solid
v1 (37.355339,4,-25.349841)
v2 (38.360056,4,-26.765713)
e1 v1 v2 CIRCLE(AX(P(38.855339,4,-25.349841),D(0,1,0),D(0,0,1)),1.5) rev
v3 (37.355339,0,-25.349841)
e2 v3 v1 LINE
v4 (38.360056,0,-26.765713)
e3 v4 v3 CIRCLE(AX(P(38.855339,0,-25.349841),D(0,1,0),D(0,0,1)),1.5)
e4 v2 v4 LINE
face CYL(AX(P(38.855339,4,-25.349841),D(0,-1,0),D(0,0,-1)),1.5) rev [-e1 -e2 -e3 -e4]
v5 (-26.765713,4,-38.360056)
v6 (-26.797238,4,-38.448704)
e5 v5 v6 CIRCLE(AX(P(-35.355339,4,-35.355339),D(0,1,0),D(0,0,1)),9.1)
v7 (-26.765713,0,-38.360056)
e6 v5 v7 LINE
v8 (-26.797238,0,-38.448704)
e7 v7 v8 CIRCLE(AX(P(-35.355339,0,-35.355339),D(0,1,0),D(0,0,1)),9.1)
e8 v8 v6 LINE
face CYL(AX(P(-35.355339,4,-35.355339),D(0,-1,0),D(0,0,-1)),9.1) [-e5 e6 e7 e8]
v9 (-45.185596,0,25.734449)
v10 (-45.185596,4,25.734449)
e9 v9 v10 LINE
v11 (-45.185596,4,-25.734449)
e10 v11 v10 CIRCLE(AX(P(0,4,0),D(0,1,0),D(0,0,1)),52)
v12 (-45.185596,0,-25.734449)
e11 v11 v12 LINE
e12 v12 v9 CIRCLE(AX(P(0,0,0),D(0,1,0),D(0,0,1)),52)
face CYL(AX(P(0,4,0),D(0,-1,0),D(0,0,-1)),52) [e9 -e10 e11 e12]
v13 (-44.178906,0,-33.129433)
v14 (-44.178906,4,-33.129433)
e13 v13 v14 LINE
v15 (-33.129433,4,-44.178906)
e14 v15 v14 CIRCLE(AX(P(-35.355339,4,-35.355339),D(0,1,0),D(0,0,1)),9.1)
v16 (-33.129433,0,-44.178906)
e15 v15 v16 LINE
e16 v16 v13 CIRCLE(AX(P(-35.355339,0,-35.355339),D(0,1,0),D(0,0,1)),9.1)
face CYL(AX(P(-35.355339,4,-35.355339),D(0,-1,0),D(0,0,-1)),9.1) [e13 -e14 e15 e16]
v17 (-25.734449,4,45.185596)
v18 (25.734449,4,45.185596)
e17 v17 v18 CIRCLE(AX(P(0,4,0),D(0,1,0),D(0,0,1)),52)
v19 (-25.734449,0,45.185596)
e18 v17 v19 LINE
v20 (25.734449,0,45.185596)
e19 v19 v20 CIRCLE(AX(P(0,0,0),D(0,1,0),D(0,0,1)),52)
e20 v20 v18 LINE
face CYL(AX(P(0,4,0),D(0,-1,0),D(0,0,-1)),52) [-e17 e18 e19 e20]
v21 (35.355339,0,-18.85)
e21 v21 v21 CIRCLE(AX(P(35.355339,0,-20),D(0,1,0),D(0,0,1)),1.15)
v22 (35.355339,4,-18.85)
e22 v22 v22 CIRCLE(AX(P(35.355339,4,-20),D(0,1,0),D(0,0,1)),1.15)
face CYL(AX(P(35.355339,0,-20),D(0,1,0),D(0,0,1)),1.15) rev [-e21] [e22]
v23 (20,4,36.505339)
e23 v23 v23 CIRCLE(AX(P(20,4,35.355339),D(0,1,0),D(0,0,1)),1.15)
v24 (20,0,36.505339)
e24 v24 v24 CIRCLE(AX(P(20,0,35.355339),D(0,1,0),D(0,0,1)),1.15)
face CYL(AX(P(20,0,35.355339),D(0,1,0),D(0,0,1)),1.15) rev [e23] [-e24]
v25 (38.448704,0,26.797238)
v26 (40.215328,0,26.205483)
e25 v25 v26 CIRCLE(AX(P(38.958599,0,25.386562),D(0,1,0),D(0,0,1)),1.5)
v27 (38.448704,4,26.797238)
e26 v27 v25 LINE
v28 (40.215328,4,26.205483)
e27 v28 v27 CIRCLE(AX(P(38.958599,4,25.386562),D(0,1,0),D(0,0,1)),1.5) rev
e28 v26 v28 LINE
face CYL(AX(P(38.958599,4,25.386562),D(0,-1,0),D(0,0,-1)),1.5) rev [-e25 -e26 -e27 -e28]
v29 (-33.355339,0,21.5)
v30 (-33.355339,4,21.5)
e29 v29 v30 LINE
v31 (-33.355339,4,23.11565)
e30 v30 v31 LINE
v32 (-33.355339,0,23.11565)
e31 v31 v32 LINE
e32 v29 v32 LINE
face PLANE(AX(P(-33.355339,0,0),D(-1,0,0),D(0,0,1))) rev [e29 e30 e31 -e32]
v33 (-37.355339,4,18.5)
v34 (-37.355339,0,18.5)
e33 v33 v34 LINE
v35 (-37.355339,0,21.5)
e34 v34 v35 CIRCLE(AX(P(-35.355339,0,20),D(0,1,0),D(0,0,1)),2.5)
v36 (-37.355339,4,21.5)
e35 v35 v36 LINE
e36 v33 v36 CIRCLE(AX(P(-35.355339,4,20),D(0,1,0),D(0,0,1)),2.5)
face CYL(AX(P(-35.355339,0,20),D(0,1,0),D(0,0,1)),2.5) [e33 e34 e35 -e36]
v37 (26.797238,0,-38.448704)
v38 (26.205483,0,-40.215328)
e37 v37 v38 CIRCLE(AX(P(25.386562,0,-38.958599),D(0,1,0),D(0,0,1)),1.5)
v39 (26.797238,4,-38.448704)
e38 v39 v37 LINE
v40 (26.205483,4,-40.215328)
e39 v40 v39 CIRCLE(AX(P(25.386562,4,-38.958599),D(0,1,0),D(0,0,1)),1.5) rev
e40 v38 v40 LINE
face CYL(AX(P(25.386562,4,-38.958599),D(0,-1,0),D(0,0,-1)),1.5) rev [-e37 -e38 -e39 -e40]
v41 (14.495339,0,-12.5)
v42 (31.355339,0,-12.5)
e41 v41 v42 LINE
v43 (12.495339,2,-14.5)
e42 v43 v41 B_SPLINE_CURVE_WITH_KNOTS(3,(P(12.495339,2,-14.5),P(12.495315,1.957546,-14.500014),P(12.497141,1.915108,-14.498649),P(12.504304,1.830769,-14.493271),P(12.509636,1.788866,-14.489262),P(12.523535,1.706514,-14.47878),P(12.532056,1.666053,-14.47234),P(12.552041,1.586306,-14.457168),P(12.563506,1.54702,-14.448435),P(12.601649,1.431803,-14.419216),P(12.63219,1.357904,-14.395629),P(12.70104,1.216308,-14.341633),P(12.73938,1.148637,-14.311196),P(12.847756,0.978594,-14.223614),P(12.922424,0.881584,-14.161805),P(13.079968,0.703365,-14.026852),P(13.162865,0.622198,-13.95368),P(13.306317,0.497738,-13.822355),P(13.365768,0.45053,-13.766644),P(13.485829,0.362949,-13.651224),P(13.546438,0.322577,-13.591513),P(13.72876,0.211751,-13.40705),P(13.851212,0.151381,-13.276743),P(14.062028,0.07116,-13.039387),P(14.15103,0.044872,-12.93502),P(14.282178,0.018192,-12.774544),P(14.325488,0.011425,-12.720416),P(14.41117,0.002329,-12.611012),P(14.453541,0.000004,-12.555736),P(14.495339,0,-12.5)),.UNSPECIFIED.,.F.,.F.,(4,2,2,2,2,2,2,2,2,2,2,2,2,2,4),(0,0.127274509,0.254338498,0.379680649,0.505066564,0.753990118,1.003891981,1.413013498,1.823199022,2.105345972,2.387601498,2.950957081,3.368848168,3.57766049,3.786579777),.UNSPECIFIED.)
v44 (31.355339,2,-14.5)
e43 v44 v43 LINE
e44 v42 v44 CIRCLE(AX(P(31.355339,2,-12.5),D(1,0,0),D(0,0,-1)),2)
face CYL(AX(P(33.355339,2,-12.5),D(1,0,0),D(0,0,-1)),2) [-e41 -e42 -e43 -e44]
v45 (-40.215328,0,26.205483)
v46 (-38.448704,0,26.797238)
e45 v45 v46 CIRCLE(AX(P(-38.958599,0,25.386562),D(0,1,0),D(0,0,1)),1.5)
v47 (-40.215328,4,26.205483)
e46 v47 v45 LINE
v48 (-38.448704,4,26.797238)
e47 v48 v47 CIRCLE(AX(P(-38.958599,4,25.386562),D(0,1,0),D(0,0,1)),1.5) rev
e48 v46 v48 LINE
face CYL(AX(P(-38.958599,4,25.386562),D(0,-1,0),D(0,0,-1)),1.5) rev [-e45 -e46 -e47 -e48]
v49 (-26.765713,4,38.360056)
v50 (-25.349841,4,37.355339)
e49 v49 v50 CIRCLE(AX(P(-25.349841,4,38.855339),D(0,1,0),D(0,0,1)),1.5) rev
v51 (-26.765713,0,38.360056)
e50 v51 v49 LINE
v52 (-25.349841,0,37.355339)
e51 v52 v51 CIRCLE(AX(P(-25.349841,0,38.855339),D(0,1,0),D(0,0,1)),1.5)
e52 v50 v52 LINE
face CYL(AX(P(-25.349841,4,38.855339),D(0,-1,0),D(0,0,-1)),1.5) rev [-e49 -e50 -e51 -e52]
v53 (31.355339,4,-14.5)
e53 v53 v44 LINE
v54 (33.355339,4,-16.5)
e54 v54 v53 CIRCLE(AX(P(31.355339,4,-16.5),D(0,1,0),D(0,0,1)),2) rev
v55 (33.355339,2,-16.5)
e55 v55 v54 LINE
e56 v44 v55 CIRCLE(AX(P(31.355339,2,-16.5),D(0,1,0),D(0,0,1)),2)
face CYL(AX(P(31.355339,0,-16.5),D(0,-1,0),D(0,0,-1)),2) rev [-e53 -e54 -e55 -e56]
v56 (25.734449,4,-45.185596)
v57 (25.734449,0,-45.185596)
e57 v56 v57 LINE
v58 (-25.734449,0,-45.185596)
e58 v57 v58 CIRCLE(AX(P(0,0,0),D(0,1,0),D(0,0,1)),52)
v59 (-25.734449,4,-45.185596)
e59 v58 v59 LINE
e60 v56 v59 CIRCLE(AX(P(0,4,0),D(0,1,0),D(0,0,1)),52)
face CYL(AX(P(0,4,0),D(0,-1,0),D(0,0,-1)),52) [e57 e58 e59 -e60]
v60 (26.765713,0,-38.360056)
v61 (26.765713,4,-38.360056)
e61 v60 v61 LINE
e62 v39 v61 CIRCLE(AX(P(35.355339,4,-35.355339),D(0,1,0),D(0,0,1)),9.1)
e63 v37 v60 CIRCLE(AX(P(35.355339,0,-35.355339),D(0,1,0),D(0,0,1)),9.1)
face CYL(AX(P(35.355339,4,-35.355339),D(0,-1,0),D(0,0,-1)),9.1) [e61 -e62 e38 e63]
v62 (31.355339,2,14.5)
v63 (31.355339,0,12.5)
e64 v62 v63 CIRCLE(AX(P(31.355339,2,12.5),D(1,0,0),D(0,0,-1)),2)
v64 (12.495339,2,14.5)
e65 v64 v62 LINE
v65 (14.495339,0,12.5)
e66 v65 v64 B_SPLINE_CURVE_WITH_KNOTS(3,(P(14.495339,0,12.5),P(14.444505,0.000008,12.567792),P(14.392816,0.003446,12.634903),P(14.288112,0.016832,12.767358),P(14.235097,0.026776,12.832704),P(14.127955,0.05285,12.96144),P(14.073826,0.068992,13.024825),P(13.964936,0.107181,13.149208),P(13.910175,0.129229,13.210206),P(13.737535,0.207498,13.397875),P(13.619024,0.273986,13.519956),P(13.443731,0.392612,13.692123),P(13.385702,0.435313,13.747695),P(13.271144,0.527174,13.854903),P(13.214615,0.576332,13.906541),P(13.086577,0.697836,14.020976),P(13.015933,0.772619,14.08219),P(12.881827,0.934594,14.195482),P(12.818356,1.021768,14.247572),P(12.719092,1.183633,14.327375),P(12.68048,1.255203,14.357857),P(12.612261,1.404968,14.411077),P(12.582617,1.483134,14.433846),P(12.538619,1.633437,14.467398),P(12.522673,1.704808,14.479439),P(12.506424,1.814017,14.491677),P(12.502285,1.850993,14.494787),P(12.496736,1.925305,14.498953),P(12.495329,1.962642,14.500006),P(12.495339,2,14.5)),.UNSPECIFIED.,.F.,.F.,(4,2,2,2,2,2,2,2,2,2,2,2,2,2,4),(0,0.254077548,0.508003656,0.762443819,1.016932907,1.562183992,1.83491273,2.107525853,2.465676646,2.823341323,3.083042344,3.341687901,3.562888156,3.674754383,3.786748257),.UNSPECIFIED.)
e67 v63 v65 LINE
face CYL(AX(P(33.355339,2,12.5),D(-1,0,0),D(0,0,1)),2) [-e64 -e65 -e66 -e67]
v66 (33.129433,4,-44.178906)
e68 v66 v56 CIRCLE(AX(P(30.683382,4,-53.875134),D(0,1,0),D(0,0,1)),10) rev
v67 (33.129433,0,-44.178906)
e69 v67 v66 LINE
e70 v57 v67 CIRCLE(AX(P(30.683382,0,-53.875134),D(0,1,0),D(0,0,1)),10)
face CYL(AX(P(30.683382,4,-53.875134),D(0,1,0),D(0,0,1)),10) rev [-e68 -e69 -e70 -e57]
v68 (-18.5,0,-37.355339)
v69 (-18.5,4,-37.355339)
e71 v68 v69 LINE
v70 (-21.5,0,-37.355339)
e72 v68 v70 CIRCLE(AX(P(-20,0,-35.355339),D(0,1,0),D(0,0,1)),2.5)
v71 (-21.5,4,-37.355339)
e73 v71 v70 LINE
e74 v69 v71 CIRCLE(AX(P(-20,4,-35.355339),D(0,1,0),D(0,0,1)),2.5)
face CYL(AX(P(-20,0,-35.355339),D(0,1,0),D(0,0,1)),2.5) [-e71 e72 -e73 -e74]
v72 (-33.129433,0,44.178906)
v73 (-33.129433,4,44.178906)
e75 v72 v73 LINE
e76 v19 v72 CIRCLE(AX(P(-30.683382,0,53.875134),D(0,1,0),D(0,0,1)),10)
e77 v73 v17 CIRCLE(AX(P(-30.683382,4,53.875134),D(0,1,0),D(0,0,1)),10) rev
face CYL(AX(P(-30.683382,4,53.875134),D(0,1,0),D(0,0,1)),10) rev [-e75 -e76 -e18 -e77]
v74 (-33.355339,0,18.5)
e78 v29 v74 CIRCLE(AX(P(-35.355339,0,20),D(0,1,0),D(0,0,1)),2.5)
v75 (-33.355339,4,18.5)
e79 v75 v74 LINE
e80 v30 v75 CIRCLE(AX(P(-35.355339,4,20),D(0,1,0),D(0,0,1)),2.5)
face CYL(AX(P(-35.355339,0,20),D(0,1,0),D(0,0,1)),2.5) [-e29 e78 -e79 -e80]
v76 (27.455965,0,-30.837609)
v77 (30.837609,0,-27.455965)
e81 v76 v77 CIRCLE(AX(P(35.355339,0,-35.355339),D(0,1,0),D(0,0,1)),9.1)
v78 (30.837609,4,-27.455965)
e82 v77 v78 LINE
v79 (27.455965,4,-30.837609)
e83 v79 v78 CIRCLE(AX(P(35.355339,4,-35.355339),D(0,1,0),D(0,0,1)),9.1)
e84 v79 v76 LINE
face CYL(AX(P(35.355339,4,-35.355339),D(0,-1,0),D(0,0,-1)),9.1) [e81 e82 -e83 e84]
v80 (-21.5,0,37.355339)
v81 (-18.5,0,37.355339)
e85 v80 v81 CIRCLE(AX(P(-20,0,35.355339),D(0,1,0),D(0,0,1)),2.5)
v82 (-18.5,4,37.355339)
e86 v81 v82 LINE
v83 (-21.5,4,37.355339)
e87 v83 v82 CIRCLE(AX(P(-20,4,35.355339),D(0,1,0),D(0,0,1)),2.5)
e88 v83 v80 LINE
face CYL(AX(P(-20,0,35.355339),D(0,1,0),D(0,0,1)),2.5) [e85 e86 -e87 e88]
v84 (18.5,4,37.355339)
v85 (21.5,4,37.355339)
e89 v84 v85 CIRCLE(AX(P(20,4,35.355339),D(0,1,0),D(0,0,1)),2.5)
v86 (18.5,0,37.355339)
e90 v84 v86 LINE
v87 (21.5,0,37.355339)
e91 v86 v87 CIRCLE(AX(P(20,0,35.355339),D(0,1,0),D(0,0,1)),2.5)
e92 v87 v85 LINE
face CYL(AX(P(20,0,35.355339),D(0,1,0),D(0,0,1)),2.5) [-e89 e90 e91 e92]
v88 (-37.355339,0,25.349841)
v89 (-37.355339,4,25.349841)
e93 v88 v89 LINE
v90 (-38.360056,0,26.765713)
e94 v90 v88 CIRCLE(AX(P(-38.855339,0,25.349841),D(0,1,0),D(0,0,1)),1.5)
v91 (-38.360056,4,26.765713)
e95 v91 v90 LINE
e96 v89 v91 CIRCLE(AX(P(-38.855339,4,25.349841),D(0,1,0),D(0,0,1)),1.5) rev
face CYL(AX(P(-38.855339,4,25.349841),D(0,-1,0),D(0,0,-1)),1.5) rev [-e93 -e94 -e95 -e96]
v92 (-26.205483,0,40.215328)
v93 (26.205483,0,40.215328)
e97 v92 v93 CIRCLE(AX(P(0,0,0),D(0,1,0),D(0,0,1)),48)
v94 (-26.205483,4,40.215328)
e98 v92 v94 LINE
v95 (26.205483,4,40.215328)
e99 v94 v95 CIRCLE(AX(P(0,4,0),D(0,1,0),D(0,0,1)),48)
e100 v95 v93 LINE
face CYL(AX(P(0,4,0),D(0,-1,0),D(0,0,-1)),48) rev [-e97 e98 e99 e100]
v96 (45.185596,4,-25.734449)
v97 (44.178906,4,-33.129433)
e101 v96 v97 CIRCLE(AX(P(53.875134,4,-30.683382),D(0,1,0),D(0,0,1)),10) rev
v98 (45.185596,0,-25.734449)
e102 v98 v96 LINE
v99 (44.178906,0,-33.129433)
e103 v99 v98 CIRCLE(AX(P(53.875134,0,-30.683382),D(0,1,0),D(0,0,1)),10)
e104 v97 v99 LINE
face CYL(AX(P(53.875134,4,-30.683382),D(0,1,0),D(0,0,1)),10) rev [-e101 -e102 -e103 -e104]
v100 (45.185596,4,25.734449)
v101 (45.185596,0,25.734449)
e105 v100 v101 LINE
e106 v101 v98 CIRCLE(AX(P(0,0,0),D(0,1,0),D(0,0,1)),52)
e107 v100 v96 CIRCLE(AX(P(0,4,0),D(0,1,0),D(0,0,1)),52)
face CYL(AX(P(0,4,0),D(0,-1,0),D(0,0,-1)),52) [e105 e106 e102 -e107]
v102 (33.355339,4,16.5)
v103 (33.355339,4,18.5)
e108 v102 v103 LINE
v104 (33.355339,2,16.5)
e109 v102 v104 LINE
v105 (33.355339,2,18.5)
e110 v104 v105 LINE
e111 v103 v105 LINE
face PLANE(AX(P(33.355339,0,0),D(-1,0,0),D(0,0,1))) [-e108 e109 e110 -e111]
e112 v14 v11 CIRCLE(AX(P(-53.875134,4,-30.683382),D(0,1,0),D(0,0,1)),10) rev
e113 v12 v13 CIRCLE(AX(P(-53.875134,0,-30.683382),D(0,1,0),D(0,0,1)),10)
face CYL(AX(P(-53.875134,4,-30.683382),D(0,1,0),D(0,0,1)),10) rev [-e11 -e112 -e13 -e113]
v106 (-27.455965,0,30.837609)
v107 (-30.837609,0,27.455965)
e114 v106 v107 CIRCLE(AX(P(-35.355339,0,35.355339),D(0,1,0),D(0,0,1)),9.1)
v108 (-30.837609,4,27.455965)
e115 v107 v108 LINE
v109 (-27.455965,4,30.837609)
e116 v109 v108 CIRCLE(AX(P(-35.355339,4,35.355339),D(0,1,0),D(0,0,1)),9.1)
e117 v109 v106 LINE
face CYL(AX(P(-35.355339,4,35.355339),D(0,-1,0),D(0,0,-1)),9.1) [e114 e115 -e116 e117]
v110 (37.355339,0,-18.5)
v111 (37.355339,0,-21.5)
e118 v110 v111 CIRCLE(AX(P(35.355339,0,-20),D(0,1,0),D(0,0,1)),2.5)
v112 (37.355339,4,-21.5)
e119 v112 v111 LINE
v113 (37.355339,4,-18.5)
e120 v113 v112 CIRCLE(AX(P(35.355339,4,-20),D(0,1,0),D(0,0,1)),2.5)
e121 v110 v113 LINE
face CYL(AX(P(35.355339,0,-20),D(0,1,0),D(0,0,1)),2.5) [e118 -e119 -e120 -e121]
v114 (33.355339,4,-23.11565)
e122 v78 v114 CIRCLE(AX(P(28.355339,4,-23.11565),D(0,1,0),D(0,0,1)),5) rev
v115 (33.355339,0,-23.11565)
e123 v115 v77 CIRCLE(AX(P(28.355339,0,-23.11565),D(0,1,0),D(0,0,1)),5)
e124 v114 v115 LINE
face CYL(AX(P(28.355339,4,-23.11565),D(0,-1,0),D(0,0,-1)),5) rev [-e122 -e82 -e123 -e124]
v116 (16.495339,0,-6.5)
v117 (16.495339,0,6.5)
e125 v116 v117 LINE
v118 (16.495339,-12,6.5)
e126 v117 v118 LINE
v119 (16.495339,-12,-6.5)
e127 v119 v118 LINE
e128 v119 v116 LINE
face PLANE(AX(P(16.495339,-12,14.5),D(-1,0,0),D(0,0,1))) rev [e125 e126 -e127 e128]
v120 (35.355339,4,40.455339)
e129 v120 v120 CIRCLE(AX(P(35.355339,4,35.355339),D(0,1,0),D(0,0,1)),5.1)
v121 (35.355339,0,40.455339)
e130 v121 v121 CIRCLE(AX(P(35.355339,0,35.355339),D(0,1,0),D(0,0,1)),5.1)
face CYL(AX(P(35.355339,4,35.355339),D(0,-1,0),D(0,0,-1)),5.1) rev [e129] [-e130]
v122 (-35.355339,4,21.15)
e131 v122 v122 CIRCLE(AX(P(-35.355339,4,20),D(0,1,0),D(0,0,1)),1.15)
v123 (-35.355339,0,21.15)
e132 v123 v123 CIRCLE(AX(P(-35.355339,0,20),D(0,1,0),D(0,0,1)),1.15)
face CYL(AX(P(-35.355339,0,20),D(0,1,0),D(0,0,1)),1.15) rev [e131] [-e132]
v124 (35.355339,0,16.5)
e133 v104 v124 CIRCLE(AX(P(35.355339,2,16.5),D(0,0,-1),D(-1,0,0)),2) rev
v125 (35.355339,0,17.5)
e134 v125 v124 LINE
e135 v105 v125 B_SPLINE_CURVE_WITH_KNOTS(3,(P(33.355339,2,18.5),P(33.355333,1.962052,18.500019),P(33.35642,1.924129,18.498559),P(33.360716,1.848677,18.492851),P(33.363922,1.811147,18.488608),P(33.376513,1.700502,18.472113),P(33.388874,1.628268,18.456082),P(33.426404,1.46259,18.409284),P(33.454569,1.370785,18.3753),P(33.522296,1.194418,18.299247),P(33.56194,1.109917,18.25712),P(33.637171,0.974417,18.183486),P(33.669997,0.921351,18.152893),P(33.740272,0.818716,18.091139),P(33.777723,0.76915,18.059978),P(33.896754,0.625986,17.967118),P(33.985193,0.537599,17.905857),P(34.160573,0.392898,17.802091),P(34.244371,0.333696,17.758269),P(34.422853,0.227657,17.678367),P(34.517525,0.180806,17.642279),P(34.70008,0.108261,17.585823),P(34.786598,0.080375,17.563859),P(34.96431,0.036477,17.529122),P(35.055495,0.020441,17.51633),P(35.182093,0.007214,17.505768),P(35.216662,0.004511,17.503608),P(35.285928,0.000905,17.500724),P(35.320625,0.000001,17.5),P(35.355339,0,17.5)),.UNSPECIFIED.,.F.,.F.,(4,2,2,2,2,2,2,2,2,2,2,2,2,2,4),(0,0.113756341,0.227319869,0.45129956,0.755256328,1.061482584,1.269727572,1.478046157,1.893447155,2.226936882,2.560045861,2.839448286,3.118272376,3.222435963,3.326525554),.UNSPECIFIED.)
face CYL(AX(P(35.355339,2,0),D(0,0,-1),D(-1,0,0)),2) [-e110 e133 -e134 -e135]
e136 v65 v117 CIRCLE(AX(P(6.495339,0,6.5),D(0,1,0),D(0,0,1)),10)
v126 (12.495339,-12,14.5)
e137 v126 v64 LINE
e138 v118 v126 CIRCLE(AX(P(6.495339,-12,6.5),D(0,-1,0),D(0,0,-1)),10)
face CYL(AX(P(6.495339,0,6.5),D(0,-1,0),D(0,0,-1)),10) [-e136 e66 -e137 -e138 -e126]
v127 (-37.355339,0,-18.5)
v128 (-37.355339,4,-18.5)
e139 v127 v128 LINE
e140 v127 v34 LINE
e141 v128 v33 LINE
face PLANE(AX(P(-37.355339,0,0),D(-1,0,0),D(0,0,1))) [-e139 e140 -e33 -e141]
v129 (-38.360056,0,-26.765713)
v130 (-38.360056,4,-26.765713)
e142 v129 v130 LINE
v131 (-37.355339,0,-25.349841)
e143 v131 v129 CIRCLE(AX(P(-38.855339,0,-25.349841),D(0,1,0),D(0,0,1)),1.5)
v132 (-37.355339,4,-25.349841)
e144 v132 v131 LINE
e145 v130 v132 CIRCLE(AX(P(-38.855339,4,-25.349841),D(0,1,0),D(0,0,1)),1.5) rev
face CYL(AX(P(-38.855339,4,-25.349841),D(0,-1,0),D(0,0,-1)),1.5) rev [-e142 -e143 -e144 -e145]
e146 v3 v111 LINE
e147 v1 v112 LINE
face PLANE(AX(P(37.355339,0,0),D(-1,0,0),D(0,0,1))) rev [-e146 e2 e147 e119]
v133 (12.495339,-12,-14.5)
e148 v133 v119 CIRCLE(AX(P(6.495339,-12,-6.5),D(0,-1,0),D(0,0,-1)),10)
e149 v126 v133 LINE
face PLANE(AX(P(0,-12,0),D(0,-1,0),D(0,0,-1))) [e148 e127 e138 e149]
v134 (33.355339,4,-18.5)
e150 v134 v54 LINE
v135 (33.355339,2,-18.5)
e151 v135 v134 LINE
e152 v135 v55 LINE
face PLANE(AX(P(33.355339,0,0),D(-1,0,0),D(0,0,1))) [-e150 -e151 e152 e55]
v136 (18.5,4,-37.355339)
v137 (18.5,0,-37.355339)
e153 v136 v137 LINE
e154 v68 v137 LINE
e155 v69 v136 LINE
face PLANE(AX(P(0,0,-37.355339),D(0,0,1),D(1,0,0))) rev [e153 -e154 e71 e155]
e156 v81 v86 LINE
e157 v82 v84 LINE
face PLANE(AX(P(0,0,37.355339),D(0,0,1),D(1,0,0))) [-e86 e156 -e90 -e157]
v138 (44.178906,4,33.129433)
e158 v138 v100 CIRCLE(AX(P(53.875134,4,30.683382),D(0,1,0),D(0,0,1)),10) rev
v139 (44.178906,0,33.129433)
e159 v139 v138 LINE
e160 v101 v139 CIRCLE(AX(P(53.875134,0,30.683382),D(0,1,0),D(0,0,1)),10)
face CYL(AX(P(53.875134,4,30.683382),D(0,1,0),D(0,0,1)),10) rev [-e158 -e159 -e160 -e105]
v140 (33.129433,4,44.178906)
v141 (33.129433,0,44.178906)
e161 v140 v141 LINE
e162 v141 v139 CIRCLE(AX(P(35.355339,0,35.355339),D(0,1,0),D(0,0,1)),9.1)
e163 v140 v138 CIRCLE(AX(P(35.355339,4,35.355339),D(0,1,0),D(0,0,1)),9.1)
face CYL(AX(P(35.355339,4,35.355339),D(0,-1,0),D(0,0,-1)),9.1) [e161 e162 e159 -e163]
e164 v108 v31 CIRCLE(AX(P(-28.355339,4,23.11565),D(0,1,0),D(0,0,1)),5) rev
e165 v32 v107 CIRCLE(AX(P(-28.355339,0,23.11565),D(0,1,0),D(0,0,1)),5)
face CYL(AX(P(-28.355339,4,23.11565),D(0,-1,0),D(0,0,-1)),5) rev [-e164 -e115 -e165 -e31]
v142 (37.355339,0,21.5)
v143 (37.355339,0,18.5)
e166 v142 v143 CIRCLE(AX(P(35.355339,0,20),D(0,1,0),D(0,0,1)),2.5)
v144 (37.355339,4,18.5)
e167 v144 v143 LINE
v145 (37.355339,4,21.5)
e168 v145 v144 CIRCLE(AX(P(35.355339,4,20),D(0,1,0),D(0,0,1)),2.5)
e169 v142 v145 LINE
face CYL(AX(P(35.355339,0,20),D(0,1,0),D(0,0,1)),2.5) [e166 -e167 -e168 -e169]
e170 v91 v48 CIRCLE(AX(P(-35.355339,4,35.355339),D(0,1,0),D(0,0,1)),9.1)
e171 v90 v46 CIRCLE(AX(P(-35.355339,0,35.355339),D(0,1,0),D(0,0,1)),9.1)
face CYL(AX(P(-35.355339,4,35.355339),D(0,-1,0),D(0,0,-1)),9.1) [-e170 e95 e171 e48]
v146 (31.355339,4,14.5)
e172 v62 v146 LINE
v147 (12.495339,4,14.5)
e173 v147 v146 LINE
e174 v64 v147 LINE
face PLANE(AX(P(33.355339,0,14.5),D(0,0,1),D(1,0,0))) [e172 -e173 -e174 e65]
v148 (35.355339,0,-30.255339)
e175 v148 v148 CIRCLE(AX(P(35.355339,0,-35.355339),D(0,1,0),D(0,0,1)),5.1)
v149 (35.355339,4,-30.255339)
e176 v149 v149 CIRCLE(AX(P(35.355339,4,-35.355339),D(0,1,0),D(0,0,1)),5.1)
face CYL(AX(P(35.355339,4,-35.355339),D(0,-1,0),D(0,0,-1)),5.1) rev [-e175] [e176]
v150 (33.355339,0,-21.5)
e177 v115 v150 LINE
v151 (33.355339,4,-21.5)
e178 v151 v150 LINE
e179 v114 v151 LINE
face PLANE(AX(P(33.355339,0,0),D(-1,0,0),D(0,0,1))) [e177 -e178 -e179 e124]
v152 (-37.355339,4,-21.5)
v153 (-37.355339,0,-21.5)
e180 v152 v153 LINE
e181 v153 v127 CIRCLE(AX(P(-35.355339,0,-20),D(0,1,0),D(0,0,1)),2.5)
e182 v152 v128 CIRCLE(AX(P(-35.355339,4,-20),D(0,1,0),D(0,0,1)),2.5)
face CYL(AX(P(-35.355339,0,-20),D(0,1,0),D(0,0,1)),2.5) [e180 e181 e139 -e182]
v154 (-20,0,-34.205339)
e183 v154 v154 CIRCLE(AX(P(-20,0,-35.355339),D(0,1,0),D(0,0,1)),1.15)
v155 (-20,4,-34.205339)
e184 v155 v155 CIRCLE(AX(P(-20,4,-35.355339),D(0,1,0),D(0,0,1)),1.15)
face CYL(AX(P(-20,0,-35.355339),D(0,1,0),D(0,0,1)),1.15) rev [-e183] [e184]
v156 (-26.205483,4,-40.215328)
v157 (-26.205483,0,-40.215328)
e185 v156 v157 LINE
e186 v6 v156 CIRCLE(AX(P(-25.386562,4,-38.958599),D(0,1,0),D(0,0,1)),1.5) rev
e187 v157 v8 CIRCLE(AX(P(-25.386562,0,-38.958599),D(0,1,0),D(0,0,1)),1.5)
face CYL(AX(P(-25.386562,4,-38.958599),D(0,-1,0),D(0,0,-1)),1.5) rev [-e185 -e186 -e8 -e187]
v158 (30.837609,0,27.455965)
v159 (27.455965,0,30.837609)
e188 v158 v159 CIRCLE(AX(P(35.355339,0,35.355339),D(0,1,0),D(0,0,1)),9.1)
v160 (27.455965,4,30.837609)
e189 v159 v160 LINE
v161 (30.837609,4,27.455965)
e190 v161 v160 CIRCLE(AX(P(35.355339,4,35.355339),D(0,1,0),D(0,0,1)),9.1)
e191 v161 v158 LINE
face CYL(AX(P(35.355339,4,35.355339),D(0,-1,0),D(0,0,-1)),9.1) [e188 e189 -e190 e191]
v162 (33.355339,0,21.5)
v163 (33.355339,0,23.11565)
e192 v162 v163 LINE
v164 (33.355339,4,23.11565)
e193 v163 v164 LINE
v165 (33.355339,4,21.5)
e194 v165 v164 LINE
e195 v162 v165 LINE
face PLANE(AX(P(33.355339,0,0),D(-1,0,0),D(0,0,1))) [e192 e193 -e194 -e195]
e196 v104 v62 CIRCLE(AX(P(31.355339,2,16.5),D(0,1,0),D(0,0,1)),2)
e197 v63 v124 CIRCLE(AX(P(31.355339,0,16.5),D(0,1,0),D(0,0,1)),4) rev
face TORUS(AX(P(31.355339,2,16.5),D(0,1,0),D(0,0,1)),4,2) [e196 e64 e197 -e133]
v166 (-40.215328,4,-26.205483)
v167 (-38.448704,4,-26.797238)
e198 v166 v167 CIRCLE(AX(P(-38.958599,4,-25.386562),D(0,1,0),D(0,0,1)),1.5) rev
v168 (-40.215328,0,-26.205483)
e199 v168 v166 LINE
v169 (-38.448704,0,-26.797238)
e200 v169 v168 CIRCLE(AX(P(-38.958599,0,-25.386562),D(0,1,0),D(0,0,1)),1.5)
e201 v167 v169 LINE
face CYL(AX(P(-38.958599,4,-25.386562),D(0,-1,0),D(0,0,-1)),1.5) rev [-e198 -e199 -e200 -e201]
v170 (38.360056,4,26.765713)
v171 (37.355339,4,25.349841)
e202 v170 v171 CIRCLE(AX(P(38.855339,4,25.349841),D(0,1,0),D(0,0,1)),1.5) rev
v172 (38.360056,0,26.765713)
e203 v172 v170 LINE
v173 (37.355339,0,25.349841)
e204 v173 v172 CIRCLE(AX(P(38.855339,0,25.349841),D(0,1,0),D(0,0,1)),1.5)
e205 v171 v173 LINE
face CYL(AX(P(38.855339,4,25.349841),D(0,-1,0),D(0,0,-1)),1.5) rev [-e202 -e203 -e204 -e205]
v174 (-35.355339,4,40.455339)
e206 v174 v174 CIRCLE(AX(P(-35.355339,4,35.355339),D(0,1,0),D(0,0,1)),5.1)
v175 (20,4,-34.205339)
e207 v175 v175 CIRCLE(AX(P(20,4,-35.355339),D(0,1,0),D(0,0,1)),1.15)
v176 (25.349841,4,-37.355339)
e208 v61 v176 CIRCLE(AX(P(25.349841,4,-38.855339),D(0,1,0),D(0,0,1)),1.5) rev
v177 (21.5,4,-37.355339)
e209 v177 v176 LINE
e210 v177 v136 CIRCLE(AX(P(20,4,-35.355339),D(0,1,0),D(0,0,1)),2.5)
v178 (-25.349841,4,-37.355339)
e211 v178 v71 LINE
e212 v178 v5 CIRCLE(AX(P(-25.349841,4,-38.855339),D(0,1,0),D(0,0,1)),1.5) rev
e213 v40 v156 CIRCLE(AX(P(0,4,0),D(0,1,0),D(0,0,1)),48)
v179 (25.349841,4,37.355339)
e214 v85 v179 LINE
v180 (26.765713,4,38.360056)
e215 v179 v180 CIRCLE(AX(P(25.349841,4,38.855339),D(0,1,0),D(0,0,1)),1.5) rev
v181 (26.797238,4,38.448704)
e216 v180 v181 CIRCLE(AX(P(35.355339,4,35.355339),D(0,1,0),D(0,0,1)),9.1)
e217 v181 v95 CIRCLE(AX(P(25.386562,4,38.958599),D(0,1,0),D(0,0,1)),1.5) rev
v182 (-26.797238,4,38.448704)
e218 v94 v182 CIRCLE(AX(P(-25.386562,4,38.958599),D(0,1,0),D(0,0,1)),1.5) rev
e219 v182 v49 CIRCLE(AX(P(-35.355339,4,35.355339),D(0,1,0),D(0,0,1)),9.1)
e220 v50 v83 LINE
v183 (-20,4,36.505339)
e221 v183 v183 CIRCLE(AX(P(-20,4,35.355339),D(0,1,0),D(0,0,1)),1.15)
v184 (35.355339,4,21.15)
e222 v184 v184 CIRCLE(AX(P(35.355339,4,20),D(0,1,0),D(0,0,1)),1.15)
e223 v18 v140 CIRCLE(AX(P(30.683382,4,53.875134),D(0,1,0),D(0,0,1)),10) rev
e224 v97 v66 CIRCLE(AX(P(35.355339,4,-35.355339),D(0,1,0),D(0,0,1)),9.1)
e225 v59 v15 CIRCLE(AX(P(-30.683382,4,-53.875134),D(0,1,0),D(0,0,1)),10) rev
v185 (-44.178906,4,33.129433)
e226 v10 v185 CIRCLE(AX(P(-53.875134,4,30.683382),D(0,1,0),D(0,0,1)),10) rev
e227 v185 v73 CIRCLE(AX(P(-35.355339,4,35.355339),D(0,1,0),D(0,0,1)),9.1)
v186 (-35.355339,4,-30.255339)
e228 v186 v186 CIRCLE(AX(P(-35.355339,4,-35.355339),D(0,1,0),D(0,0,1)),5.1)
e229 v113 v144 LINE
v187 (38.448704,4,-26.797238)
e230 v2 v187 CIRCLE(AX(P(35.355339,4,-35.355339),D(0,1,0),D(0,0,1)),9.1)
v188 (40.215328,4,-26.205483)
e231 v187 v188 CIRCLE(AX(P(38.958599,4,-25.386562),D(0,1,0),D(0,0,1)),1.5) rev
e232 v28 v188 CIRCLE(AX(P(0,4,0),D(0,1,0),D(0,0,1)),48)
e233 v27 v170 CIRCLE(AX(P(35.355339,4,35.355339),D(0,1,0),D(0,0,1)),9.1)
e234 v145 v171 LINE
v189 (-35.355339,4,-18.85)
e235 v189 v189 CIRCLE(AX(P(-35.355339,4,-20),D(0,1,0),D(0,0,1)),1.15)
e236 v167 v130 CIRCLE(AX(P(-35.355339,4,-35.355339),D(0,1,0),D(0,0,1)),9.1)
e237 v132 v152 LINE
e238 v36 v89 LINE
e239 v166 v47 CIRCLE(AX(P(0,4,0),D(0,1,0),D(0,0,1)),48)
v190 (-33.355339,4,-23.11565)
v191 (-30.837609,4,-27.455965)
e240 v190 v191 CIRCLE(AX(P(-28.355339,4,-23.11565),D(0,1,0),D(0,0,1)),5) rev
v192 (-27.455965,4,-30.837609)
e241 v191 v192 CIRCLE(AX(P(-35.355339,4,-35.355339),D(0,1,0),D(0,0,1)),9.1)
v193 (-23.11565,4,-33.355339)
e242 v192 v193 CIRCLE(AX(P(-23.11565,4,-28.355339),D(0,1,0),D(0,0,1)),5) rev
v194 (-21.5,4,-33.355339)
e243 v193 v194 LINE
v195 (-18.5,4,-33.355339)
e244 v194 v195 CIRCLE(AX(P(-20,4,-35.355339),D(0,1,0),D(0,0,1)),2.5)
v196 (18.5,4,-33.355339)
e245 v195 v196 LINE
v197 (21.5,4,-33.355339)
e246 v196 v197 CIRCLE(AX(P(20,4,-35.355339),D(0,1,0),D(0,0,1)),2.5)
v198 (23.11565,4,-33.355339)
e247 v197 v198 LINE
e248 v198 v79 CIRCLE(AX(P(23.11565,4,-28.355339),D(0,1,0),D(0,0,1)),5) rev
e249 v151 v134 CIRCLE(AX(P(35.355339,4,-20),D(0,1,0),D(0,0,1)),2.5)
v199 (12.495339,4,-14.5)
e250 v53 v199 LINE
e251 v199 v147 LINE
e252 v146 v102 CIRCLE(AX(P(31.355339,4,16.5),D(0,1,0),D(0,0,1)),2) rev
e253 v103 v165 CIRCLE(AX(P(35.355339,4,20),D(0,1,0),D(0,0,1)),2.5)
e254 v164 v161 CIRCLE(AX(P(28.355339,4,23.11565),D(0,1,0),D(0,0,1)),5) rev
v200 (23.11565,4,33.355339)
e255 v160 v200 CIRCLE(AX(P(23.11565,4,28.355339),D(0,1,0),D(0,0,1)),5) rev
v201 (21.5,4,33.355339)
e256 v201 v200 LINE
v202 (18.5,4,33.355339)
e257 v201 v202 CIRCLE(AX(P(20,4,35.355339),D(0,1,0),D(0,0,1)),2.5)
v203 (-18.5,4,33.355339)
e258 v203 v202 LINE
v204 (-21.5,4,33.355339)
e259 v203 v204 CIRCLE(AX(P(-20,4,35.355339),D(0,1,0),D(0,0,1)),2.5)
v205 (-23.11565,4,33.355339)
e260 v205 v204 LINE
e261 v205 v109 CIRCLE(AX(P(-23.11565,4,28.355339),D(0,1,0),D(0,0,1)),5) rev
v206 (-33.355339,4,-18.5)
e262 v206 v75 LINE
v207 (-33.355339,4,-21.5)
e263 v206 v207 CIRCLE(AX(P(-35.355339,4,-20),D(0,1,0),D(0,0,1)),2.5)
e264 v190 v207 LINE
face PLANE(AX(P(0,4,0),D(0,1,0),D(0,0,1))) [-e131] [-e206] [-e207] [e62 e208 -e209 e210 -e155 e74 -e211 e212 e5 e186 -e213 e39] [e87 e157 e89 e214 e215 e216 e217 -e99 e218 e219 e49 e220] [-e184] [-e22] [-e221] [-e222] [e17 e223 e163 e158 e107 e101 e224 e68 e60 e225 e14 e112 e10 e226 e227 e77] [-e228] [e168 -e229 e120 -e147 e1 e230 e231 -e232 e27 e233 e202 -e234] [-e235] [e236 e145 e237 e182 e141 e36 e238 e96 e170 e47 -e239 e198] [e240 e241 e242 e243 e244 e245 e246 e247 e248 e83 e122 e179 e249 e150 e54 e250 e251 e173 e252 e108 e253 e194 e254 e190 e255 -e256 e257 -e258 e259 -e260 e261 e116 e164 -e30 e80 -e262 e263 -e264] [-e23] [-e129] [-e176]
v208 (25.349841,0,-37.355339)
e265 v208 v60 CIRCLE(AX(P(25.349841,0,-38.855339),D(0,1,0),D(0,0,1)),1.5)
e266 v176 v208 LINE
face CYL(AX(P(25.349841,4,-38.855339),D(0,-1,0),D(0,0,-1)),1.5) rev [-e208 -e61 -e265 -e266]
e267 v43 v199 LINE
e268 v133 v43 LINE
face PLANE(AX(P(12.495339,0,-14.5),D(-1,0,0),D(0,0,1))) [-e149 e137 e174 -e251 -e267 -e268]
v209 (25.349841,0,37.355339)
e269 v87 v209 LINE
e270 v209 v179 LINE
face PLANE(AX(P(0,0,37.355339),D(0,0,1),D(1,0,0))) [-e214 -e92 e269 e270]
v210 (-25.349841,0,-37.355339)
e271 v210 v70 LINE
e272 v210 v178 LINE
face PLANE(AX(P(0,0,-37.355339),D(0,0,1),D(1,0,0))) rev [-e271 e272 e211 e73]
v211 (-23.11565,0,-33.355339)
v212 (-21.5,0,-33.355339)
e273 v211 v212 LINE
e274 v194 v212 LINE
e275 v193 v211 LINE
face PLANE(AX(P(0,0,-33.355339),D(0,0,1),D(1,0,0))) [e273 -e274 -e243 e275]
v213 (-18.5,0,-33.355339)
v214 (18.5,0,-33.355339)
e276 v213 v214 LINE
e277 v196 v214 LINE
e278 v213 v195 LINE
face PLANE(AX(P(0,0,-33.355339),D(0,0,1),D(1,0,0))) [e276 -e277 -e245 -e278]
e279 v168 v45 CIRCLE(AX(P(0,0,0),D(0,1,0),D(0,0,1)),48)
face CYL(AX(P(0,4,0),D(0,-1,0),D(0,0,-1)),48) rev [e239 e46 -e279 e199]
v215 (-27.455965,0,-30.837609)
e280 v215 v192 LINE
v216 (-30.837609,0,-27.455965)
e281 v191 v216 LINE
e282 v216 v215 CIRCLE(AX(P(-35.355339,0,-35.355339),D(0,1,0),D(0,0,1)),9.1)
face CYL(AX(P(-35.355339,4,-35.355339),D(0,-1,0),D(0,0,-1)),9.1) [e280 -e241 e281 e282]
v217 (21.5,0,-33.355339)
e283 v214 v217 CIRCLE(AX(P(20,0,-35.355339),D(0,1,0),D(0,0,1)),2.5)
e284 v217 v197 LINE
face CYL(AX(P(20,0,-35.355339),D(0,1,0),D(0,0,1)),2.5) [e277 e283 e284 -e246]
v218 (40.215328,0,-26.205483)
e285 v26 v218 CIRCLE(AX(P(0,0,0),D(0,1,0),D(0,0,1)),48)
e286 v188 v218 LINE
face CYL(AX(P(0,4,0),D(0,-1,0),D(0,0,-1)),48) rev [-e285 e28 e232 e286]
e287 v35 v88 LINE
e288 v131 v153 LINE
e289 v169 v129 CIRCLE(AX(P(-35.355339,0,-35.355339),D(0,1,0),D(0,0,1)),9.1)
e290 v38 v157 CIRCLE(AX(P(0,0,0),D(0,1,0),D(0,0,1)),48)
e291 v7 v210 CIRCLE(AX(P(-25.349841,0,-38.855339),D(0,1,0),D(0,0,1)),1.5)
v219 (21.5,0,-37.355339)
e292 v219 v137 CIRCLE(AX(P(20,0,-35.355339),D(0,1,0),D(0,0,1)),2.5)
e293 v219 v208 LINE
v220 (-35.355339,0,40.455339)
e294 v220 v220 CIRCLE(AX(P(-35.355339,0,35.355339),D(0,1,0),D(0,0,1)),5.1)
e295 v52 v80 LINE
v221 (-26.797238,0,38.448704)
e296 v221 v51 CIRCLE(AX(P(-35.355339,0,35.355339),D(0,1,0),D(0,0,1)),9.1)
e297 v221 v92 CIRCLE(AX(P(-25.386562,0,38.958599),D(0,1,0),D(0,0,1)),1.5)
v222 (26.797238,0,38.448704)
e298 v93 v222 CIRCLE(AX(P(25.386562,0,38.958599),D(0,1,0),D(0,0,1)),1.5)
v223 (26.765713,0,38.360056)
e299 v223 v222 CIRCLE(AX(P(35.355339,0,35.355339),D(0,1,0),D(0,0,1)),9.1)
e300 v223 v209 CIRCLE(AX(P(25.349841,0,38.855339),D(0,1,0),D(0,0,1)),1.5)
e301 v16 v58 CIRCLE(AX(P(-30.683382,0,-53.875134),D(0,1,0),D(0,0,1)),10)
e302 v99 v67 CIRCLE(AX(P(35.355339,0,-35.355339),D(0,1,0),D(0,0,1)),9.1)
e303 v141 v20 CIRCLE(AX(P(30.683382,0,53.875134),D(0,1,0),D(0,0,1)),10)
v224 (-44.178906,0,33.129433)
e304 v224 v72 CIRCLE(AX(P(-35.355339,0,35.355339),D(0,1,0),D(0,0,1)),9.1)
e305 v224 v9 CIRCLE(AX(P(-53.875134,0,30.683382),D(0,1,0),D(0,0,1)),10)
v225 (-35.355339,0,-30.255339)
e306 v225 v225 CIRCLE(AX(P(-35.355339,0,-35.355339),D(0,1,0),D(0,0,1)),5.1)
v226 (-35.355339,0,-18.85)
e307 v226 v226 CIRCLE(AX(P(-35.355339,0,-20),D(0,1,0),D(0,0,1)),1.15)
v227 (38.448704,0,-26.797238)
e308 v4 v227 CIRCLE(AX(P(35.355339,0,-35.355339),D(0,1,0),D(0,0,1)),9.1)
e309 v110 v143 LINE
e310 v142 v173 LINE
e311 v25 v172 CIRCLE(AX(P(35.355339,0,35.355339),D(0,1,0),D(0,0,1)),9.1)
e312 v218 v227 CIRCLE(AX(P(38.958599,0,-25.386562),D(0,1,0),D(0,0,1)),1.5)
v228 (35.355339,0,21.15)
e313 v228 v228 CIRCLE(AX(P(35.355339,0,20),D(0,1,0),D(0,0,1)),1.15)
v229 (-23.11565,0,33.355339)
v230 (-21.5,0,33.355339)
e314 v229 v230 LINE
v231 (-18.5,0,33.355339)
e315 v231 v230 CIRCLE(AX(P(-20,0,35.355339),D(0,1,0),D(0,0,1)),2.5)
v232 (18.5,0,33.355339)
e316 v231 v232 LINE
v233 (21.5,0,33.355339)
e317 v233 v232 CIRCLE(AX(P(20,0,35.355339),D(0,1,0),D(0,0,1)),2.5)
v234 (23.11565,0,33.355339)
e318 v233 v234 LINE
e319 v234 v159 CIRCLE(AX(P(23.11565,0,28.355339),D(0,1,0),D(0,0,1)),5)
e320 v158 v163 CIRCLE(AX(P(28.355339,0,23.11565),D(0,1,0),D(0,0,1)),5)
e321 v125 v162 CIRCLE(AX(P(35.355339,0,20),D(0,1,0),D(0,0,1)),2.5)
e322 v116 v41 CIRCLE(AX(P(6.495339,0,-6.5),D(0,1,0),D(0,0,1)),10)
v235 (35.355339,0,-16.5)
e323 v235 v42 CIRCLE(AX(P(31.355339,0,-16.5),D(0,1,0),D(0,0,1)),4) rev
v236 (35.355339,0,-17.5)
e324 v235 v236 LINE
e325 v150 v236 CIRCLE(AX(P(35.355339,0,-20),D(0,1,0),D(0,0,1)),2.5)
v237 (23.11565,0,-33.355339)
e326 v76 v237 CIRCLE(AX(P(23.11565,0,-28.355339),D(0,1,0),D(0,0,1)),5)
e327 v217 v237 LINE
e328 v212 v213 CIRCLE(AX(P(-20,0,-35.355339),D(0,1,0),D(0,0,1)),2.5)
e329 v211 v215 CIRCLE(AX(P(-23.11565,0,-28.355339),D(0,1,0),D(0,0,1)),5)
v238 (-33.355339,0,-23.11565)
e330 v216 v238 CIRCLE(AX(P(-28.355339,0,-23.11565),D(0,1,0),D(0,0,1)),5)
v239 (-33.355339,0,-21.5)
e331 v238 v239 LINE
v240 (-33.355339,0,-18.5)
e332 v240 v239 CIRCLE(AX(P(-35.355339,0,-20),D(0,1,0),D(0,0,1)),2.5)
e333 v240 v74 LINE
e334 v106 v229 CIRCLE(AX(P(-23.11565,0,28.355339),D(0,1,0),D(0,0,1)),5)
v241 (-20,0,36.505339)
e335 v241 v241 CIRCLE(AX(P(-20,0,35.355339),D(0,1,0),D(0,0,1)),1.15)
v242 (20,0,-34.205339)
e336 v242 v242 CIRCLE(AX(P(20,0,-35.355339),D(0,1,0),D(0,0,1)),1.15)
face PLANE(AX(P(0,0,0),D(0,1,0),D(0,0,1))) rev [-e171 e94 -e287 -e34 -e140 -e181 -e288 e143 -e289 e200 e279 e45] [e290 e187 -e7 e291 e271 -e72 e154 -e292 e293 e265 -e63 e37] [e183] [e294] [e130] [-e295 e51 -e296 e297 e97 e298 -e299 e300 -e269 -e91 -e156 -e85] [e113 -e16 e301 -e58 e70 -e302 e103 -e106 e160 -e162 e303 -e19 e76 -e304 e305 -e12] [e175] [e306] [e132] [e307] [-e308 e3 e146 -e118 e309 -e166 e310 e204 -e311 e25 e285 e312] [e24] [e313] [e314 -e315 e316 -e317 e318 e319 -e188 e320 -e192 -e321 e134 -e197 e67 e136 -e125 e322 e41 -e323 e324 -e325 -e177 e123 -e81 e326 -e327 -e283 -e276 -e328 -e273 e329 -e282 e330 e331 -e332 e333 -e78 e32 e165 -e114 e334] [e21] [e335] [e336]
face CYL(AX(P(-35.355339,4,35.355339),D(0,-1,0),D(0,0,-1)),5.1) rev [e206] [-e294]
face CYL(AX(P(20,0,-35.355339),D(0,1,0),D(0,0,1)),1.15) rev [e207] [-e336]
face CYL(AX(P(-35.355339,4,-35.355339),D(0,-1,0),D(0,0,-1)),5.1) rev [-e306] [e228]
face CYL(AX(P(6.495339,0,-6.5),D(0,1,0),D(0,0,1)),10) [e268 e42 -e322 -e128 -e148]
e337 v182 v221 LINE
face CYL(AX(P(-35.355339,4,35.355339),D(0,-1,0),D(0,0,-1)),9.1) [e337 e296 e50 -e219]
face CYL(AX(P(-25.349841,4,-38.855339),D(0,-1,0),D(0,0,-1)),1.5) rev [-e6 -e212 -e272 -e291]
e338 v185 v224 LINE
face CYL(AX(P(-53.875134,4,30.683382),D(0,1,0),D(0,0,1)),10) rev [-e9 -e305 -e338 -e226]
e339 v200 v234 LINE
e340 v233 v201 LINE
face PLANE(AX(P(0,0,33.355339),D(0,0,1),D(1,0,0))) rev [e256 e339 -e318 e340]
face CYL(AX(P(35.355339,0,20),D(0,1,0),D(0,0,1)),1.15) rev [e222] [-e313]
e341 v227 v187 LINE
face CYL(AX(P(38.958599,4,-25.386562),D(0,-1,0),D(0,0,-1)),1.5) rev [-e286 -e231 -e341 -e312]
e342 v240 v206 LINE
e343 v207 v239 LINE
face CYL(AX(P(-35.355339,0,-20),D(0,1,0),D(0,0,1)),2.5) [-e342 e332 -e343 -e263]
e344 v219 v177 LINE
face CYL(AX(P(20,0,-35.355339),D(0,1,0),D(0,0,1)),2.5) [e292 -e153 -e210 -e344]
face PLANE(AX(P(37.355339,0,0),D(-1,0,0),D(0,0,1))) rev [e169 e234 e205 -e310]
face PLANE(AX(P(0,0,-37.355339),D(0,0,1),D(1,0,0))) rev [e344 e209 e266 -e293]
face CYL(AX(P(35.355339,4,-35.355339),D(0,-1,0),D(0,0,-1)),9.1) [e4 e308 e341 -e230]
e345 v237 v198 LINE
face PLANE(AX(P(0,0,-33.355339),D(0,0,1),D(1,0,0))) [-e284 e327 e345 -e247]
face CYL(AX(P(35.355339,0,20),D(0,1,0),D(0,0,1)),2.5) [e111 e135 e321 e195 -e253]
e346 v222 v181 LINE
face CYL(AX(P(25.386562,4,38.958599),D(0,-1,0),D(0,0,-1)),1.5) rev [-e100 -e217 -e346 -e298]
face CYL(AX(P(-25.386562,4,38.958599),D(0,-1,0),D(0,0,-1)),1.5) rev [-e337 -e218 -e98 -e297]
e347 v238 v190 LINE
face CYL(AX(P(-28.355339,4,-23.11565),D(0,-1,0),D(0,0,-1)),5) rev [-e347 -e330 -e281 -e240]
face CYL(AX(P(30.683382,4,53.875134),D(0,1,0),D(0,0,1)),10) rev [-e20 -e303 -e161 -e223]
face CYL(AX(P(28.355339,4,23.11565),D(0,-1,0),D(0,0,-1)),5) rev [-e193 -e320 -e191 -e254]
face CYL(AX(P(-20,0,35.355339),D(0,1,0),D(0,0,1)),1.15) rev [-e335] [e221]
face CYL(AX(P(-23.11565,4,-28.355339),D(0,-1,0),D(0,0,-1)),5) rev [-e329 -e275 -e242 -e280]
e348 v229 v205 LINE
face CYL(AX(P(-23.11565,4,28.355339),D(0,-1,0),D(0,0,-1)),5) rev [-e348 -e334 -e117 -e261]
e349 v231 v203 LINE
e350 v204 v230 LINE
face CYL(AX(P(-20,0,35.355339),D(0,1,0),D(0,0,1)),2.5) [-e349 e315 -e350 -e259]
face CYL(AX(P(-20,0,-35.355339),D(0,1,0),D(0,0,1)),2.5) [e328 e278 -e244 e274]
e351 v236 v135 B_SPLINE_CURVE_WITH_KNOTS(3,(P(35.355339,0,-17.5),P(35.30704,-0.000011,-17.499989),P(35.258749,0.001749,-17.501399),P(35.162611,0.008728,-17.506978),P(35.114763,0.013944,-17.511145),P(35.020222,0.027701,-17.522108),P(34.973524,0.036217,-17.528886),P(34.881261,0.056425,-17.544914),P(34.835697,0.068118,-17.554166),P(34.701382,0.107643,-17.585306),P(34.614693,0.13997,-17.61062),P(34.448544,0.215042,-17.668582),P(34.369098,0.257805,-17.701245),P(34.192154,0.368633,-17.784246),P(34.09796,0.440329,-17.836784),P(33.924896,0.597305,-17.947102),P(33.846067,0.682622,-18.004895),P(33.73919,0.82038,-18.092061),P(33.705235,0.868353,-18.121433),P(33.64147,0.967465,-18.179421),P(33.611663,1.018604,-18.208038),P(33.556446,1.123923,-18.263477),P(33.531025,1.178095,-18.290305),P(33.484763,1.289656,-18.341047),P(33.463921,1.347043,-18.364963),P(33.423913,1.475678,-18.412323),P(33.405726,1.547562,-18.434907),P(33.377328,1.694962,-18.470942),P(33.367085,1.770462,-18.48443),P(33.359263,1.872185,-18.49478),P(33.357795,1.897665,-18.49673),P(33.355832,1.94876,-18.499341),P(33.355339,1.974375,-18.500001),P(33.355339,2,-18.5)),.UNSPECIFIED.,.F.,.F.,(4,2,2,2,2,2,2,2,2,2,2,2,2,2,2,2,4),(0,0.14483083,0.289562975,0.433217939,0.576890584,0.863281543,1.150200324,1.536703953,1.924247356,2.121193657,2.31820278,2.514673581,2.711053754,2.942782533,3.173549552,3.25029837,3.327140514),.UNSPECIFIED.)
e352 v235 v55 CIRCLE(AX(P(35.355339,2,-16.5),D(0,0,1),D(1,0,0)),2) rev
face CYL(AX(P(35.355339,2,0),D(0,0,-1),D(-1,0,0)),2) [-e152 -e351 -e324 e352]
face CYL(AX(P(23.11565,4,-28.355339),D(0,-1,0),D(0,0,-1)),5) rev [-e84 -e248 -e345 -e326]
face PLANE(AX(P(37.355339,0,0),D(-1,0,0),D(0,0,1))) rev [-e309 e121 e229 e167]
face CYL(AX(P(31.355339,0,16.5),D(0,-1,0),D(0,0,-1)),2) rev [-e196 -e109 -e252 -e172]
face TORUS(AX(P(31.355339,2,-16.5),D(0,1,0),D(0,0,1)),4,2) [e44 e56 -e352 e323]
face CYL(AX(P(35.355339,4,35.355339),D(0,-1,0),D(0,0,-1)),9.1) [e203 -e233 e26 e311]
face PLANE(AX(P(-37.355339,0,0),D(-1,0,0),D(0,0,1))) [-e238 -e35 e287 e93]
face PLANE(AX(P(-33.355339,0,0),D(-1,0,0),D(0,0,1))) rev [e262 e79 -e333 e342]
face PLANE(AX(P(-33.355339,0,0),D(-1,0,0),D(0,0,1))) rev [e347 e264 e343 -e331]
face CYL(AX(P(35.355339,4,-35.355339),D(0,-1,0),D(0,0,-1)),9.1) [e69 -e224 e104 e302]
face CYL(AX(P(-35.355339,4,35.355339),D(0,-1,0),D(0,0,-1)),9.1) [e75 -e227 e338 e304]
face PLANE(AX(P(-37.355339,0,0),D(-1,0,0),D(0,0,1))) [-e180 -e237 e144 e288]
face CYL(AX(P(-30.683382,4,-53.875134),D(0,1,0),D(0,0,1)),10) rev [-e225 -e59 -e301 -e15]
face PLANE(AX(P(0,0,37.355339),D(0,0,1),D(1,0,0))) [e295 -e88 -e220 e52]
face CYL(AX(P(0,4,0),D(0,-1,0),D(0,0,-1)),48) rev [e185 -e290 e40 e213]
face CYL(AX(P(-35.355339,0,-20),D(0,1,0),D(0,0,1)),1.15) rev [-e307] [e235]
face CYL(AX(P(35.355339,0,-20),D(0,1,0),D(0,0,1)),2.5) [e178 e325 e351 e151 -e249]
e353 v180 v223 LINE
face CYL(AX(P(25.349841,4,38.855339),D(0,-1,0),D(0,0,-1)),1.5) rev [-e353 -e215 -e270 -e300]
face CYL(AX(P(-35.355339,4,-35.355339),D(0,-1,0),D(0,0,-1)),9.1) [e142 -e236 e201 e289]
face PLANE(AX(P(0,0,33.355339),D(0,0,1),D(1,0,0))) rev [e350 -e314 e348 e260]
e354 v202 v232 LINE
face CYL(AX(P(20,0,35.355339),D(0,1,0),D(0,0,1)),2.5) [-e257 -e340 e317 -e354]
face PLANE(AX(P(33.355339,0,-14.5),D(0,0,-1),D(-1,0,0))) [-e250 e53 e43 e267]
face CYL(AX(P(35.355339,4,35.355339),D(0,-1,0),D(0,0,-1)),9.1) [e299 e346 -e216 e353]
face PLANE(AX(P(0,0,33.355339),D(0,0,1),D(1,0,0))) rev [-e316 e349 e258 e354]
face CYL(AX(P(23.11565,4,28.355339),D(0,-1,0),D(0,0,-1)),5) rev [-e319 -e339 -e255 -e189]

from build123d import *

# Parameters (mm, degrees)
SKETCH1_R           = 5.1
BOSS_EXTRUDE1_DEPTH = 4
BOSS_EXTRUDE2_START = -4
BOSS_EXTRUDE2_DEPTH = 4
SKETCH3_R           = 2.5
BOSS_EXTRUDE3_DEPTH = 4
SKETCH4_R           = 1.15
CUT_EXTRUDE1_DEPTH  = 4
FILLET1_R           = 10
FILLET2_R           = 1.5
FILLET3_R           = 5
SKETCH5_W           = 20.86
SKETCH5_H           = 29
BOSS_EXTRUDE4_DEPTH = 4
SKETCH6_W           = 4
SKETCH6_H           = 29
BOSS_EXTRUDE5_DEPTH = 12
FILLET4_R           = 10
FILLET5_R           = 2


with BuildPart() as part:
    # Sketch1 → Boss-Extrude1 (new body)
    with BuildSketch(Plane(origin=(0, 0, 0), x_dir=(1, 0, 0), z_dir=(0, 1, 0))):
        with BuildLine():
            ThreePointArc((-42.589636172, 29.834927363), (-52, 0), (-42.589636172, -29.834927363))
            ThreePointArc((-42.589636172, -29.834927363), (-41.790010768, -41.790010768), (-29.834927363, -42.589636172))
            ThreePointArc((-29.834927363, -42.589636172), (0, -52), (29.834927363, -42.589636172))
            ThreePointArc((29.834927363, -42.589636172), (41.790010768, -41.790010768), (42.589636172, -29.834927363))
            ThreePointArc((42.589636172, -29.834927363), (52, 0), (42.589636172, 29.834927363))
            ThreePointArc((42.589636172, 29.834927363), (41.790010768, 41.790010768), (29.834927363, 42.589636172))
            ThreePointArc((29.834927363, 42.589636172), (0, 52), (-29.834927363, 42.589636172))
            ThreePointArc((-29.834927363, 42.589636172), (-41.790010768, 41.790010768), (-42.589636172, 29.834927363))
        make_face()
        with Locations(Location((-35.355339059, -35.355339059, 0), (0, 0, 270))):
            Circle(SKETCH1_R, mode=Mode.SUBTRACT)
        with Locations(Location((35.355339059, -35.355339059, 0), (0, 0, 270))):
            Circle(SKETCH1_R, mode=Mode.SUBTRACT)
        with BuildLine():
            ThreePointArc((-27.258640426, -39.509068859), (-28.920667351, -28.920667351), (-39.509068859, -27.258640426))
            ThreePointArc((-39.509068859, -27.258640426), (-48, 0), (-39.509068859, 27.258640426))
            ThreePointArc((-39.509068859, 27.258640426), (-28.920667351, 28.920667351), (-27.258640426, 39.509068859))
            ThreePointArc((-27.258640426, 39.509068859), (0, 48), (27.258640426, 39.509068859))
            ThreePointArc((27.258640426, 39.509068859), (28.920667351, 28.920667351), (39.509068859, 27.258640426))
            ThreePointArc((39.509068859, 27.258640426), (48, 0), (39.509068859, -27.258640426))
            ThreePointArc((39.509068859, -27.258640426), (28.920667351, -28.920667351), (27.258640426, -39.509068859))
            ThreePointArc((27.258640426, -39.509068859), (0, -48), (-27.258640426, -39.509068859))
        make_face(mode=Mode.SUBTRACT)
        with Locations(Location((-35.355339059, 35.355339059, 0), (0, 0, 270))):
            Circle(SKETCH1_R, mode=Mode.SUBTRACT)
        with Locations(Location((35.355339059, 35.355339059, 0), (0, 0, 270))):
            Circle(SKETCH1_R, mode=Mode.SUBTRACT)
    extrude(amount=BOSS_EXTRUDE1_DEPTH)

    # Sketch2 → Boss-Extrude2 (add)
    with BuildSketch(Plane(origin=(0, 4, 0), x_dir=(1, 0, 0), z_dir=(0, 1, 0)).offset(BOSS_EXTRUDE2_START)):
        with BuildLine():
            ThreePointArc((-26.255339059, 35.355339059), (-26.311135203, 34.349169788), (-26.477839411, 33.355339059))
            Line((-26.477839411, 33.355339059), (26.477839411, 33.355339059))
            ThreePointArc((26.477839411, 33.355339059), (26.255339059, 35.355339059), (26.477839411, 37.355339059))
            Line((26.477839411, 37.355339059), (-26.477839411, 37.355339059))
            ThreePointArc((-26.477839411, 37.355339059), (-26.311135203, 36.36150833), (-26.255339059, 35.355339059))
        make_face()
        with BuildLine():
            Line((-33.355339059, -26.477839411), (-33.355339059, 26.477839411))
            ThreePointArc((-33.355339059, 26.477839411), (-35.355339059, 26.255339059), (-37.355339059, 26.477839411))
            Line((-37.355339059, 26.477839411), (-37.355339059, -26.477839411))
            ThreePointArc((-37.355339059, -26.477839411), (-35.355339059, -26.255339059), (-33.355339059, -26.477839411))
        make_face()
        with BuildLine():
            ThreePointArc((37.355339059, 26.477839411), (35.355339059, 26.255339059), (33.355339059, 26.477839411))
            Line((33.355339059, 26.477839411), (33.355339059, -26.477839411))
            ThreePointArc((33.355339059, -26.477839411), (35.355339059, -26.255339059), (37.355339059, -26.477839411))
            Line((37.355339059, -26.477839411), (37.355339059, 26.477839411))
        make_face()
        with BuildLine():
            Line((26.477839411, -33.355339059), (-26.477839411, -33.355339059))
            ThreePointArc((-26.477839411, -33.355339059), (-26.311135203, -34.349169788), (-26.255339059, -35.355339059))
            ThreePointArc((-26.255339059, -35.355339059), (-26.311135203, -36.36150833), (-26.477839411, -37.355339059))
            Line((-26.477839411, -37.355339059), (26.477839411, -37.355339059))
            ThreePointArc((26.477839411, -37.355339059), (26.255339059, -35.355339059), (26.477839411, -33.355339059))
        make_face()
    extrude(amount=BOSS_EXTRUDE2_DEPTH)

    # Sketch3 → Boss-Extrude3 (add)
    with BuildSketch(Plane(origin=(0, 4, 0), x_dir=(1, 0, 0), z_dir=(0, 1, 0))):
        with Locations((-20, 35.355339059)):
            Circle(SKETCH3_R)
        with Locations((20, 35.355339059)):
            Circle(SKETCH3_R)
        with Locations((35.355339059, 20)):
            Circle(SKETCH3_R)
        with Locations((35.355339059, -20)):
            Circle(SKETCH3_R)
        with Locations((-35.355339059, -20)):
            Circle(SKETCH3_R)
        with Locations((-35.355339059, 20)):
            Circle(SKETCH3_R)
        with Locations((-20, -35.355339059)):
            Circle(SKETCH3_R)
        with Locations((20, -35.355339059)):
            Circle(SKETCH3_R)
    extrude(amount=-BOSS_EXTRUDE3_DEPTH)

    # Sketch4 → Cut-Extrude1 (cut)
    with BuildSketch(Plane(origin=(0, 4, 0), x_dir=(1, 0, 0), z_dir=(0, 1, 0))):
        with Locations(Location((-20, 35.355339059, 0), (0, 0, 270))):
            Circle(SKETCH4_R)
        with Locations(Location((20, 35.355339059, 0), (0, 0, 270))):
            Circle(SKETCH4_R)
        with Locations(Location((-35.355339059, 20, 0), (0, 0, 270))):
            Circle(SKETCH4_R)
        with Locations(Location((-35.355339059, -20, 0), (0, 0, 270))):
            Circle(SKETCH4_R)
        with Locations(Location((-20, -35.355339059, 0), (0, 0, 270))):
            Circle(SKETCH4_R)
        with Locations(Location((20, -35.355339059, 0), (0, 0, 270))):
            Circle(SKETCH4_R)
        with Locations(Location((35.355339059, -20, 0), (0, 0, 270))):
            Circle(SKETCH4_R)
        with Locations(Location((35.355339059, 20, 0), (0, 0, 270))):
            Circle(SKETCH4_R)
    extrude(amount=-CUT_EXTRUDE1_DEPTH, mode=Mode.SUBTRACT)

    # Fillet1
    fillet1_edges = [part.edges().sort_by_distance(p)[0] for p in [
        (-42.589636172, 2, 29.834927363),
        (-42.589636172, 2, -29.834927363),
        (-29.834927363, 2, -42.589636172),
        (29.834927363, 2, -42.589636172),
        (42.589636172, 2, -29.834927363),
        (42.589636172, 2, 29.834927363),
        (29.834927363, 2, 42.589636172),
        (-29.834927363, 2, 42.589636172),
    ]]
    fillet(fillet1_edges, radius=FILLET1_R)

    # Fillet2
    fillet2_edges = [part.edges().sort_by_distance(p)[0] for p in [
        (37.355339059, 2, -26.477839411),
        (37.355339059, 2, 26.477839411),
        (-26.477839411, 2, 37.355339059),
        (26.477839411, 2, 37.355339059),
        (27.258640426, 2, 39.509068859),
        (39.509068859, 2, 27.258640426),
        (39.509068859, 2, -27.258640426),
        (27.258640426, 2, -39.509068859),
        (-27.258640426, 2, -39.509068859),
        (-39.509068859, 2, -27.258640426),
        (-39.509068859, 2, 27.258640426),
        (-27.258640426, 2, 39.509068859),
        (-26.477839411, 2, -37.355339059),
        (26.477839411, 2, -37.355339059),
        (-37.355339059, 2, -26.477839411),
        (-37.355339059, 2, 26.477839411),
    ]]
    fillet(fillet2_edges, radius=FILLET2_R)

    # Fillet3
    fillet3_edges = [part.edges().sort_by_distance(p)[0] for p in [
        (33.355339059, 2, -26.477839411),
        (33.355339059, 2, 26.477839411),
        (-26.477839411, 2, 33.355339059),
        (26.477839411, 2, 33.355339059),
        (-26.477839411, 2, -33.355339059),
        (26.477839411, 2, -33.355339059),
        (-33.355339059, 2, -26.477839411),
        (-33.355339059, 2, 26.477839411),
    ]]
    fillet(fillet3_edges, radius=FILLET3_R)

    # Sketch5 → Boss-Extrude4 (add)
    with BuildSketch(Plane(origin=(0, 4, 0), x_dir=(1, 0, 0), z_dir=(0, 1, 0))):
        with Locations((22.925339059, 0)):
            Rectangle(SKETCH5_W, SKETCH5_H)
    extrude(amount=-BOSS_EXTRUDE4_DEPTH)

    # Sketch6 → Boss-Extrude5 (add)
    with BuildSketch(Plane.XZ):
        with Locations((14.495339059, 0)):
            Rectangle(SKETCH6_W, SKETCH6_H)
    extrude(amount=BOSS_EXTRUDE5_DEPTH)

    # Fillet4
    # the kernel refuses this fillet: 10 mm, written as the material it takes off along each edge
    with BuildSketch(Plane(origin=(16.495339059, 0, -14.5), x_dir=(-1, 0, 0), z_dir=(0, -1, 0))) as fillet4_piece_1:
        with BuildLine():
            CenterArc((10, -8), FILLET4_R, 126.869897646, 53.130102354)
            Line((0, -8), (0, 0))
            Line((0, 0), (4, 0))
        make_face()
    extrude(amount=32, mode=Mode.SUBTRACT)
    with BuildSketch(Plane(origin=(16.495339059, 0, 14.5), x_dir=(0, 0, -1), z_dir=(0, -1, 0))) as fillet4_piece_2:
        with BuildLine():
            CenterArc((8, -10), FILLET4_R, 90, 53.130102354)
            Line((0, -4), (0, 0))
            Line((0, 0), (8, 0))
        make_face()
    extrude(amount=32, mode=Mode.SUBTRACT)

    # Fillet5
    fillet5_edges = [part.edges().sort_by_distance(p)[0] for p in [
        (33.355339059, 0, 16.5),
        (33.355339059, 2, -14.5),
        (33.355339059, 2, 14.5),
        (22.925339059, 0, -14.5),
        (22.925339059, 0, 14.5),
        (33.355339059, 0, -16.5),
    ]]
    fillet(fillet5_edges, radius=FILLET5_R)


solid = part.part
